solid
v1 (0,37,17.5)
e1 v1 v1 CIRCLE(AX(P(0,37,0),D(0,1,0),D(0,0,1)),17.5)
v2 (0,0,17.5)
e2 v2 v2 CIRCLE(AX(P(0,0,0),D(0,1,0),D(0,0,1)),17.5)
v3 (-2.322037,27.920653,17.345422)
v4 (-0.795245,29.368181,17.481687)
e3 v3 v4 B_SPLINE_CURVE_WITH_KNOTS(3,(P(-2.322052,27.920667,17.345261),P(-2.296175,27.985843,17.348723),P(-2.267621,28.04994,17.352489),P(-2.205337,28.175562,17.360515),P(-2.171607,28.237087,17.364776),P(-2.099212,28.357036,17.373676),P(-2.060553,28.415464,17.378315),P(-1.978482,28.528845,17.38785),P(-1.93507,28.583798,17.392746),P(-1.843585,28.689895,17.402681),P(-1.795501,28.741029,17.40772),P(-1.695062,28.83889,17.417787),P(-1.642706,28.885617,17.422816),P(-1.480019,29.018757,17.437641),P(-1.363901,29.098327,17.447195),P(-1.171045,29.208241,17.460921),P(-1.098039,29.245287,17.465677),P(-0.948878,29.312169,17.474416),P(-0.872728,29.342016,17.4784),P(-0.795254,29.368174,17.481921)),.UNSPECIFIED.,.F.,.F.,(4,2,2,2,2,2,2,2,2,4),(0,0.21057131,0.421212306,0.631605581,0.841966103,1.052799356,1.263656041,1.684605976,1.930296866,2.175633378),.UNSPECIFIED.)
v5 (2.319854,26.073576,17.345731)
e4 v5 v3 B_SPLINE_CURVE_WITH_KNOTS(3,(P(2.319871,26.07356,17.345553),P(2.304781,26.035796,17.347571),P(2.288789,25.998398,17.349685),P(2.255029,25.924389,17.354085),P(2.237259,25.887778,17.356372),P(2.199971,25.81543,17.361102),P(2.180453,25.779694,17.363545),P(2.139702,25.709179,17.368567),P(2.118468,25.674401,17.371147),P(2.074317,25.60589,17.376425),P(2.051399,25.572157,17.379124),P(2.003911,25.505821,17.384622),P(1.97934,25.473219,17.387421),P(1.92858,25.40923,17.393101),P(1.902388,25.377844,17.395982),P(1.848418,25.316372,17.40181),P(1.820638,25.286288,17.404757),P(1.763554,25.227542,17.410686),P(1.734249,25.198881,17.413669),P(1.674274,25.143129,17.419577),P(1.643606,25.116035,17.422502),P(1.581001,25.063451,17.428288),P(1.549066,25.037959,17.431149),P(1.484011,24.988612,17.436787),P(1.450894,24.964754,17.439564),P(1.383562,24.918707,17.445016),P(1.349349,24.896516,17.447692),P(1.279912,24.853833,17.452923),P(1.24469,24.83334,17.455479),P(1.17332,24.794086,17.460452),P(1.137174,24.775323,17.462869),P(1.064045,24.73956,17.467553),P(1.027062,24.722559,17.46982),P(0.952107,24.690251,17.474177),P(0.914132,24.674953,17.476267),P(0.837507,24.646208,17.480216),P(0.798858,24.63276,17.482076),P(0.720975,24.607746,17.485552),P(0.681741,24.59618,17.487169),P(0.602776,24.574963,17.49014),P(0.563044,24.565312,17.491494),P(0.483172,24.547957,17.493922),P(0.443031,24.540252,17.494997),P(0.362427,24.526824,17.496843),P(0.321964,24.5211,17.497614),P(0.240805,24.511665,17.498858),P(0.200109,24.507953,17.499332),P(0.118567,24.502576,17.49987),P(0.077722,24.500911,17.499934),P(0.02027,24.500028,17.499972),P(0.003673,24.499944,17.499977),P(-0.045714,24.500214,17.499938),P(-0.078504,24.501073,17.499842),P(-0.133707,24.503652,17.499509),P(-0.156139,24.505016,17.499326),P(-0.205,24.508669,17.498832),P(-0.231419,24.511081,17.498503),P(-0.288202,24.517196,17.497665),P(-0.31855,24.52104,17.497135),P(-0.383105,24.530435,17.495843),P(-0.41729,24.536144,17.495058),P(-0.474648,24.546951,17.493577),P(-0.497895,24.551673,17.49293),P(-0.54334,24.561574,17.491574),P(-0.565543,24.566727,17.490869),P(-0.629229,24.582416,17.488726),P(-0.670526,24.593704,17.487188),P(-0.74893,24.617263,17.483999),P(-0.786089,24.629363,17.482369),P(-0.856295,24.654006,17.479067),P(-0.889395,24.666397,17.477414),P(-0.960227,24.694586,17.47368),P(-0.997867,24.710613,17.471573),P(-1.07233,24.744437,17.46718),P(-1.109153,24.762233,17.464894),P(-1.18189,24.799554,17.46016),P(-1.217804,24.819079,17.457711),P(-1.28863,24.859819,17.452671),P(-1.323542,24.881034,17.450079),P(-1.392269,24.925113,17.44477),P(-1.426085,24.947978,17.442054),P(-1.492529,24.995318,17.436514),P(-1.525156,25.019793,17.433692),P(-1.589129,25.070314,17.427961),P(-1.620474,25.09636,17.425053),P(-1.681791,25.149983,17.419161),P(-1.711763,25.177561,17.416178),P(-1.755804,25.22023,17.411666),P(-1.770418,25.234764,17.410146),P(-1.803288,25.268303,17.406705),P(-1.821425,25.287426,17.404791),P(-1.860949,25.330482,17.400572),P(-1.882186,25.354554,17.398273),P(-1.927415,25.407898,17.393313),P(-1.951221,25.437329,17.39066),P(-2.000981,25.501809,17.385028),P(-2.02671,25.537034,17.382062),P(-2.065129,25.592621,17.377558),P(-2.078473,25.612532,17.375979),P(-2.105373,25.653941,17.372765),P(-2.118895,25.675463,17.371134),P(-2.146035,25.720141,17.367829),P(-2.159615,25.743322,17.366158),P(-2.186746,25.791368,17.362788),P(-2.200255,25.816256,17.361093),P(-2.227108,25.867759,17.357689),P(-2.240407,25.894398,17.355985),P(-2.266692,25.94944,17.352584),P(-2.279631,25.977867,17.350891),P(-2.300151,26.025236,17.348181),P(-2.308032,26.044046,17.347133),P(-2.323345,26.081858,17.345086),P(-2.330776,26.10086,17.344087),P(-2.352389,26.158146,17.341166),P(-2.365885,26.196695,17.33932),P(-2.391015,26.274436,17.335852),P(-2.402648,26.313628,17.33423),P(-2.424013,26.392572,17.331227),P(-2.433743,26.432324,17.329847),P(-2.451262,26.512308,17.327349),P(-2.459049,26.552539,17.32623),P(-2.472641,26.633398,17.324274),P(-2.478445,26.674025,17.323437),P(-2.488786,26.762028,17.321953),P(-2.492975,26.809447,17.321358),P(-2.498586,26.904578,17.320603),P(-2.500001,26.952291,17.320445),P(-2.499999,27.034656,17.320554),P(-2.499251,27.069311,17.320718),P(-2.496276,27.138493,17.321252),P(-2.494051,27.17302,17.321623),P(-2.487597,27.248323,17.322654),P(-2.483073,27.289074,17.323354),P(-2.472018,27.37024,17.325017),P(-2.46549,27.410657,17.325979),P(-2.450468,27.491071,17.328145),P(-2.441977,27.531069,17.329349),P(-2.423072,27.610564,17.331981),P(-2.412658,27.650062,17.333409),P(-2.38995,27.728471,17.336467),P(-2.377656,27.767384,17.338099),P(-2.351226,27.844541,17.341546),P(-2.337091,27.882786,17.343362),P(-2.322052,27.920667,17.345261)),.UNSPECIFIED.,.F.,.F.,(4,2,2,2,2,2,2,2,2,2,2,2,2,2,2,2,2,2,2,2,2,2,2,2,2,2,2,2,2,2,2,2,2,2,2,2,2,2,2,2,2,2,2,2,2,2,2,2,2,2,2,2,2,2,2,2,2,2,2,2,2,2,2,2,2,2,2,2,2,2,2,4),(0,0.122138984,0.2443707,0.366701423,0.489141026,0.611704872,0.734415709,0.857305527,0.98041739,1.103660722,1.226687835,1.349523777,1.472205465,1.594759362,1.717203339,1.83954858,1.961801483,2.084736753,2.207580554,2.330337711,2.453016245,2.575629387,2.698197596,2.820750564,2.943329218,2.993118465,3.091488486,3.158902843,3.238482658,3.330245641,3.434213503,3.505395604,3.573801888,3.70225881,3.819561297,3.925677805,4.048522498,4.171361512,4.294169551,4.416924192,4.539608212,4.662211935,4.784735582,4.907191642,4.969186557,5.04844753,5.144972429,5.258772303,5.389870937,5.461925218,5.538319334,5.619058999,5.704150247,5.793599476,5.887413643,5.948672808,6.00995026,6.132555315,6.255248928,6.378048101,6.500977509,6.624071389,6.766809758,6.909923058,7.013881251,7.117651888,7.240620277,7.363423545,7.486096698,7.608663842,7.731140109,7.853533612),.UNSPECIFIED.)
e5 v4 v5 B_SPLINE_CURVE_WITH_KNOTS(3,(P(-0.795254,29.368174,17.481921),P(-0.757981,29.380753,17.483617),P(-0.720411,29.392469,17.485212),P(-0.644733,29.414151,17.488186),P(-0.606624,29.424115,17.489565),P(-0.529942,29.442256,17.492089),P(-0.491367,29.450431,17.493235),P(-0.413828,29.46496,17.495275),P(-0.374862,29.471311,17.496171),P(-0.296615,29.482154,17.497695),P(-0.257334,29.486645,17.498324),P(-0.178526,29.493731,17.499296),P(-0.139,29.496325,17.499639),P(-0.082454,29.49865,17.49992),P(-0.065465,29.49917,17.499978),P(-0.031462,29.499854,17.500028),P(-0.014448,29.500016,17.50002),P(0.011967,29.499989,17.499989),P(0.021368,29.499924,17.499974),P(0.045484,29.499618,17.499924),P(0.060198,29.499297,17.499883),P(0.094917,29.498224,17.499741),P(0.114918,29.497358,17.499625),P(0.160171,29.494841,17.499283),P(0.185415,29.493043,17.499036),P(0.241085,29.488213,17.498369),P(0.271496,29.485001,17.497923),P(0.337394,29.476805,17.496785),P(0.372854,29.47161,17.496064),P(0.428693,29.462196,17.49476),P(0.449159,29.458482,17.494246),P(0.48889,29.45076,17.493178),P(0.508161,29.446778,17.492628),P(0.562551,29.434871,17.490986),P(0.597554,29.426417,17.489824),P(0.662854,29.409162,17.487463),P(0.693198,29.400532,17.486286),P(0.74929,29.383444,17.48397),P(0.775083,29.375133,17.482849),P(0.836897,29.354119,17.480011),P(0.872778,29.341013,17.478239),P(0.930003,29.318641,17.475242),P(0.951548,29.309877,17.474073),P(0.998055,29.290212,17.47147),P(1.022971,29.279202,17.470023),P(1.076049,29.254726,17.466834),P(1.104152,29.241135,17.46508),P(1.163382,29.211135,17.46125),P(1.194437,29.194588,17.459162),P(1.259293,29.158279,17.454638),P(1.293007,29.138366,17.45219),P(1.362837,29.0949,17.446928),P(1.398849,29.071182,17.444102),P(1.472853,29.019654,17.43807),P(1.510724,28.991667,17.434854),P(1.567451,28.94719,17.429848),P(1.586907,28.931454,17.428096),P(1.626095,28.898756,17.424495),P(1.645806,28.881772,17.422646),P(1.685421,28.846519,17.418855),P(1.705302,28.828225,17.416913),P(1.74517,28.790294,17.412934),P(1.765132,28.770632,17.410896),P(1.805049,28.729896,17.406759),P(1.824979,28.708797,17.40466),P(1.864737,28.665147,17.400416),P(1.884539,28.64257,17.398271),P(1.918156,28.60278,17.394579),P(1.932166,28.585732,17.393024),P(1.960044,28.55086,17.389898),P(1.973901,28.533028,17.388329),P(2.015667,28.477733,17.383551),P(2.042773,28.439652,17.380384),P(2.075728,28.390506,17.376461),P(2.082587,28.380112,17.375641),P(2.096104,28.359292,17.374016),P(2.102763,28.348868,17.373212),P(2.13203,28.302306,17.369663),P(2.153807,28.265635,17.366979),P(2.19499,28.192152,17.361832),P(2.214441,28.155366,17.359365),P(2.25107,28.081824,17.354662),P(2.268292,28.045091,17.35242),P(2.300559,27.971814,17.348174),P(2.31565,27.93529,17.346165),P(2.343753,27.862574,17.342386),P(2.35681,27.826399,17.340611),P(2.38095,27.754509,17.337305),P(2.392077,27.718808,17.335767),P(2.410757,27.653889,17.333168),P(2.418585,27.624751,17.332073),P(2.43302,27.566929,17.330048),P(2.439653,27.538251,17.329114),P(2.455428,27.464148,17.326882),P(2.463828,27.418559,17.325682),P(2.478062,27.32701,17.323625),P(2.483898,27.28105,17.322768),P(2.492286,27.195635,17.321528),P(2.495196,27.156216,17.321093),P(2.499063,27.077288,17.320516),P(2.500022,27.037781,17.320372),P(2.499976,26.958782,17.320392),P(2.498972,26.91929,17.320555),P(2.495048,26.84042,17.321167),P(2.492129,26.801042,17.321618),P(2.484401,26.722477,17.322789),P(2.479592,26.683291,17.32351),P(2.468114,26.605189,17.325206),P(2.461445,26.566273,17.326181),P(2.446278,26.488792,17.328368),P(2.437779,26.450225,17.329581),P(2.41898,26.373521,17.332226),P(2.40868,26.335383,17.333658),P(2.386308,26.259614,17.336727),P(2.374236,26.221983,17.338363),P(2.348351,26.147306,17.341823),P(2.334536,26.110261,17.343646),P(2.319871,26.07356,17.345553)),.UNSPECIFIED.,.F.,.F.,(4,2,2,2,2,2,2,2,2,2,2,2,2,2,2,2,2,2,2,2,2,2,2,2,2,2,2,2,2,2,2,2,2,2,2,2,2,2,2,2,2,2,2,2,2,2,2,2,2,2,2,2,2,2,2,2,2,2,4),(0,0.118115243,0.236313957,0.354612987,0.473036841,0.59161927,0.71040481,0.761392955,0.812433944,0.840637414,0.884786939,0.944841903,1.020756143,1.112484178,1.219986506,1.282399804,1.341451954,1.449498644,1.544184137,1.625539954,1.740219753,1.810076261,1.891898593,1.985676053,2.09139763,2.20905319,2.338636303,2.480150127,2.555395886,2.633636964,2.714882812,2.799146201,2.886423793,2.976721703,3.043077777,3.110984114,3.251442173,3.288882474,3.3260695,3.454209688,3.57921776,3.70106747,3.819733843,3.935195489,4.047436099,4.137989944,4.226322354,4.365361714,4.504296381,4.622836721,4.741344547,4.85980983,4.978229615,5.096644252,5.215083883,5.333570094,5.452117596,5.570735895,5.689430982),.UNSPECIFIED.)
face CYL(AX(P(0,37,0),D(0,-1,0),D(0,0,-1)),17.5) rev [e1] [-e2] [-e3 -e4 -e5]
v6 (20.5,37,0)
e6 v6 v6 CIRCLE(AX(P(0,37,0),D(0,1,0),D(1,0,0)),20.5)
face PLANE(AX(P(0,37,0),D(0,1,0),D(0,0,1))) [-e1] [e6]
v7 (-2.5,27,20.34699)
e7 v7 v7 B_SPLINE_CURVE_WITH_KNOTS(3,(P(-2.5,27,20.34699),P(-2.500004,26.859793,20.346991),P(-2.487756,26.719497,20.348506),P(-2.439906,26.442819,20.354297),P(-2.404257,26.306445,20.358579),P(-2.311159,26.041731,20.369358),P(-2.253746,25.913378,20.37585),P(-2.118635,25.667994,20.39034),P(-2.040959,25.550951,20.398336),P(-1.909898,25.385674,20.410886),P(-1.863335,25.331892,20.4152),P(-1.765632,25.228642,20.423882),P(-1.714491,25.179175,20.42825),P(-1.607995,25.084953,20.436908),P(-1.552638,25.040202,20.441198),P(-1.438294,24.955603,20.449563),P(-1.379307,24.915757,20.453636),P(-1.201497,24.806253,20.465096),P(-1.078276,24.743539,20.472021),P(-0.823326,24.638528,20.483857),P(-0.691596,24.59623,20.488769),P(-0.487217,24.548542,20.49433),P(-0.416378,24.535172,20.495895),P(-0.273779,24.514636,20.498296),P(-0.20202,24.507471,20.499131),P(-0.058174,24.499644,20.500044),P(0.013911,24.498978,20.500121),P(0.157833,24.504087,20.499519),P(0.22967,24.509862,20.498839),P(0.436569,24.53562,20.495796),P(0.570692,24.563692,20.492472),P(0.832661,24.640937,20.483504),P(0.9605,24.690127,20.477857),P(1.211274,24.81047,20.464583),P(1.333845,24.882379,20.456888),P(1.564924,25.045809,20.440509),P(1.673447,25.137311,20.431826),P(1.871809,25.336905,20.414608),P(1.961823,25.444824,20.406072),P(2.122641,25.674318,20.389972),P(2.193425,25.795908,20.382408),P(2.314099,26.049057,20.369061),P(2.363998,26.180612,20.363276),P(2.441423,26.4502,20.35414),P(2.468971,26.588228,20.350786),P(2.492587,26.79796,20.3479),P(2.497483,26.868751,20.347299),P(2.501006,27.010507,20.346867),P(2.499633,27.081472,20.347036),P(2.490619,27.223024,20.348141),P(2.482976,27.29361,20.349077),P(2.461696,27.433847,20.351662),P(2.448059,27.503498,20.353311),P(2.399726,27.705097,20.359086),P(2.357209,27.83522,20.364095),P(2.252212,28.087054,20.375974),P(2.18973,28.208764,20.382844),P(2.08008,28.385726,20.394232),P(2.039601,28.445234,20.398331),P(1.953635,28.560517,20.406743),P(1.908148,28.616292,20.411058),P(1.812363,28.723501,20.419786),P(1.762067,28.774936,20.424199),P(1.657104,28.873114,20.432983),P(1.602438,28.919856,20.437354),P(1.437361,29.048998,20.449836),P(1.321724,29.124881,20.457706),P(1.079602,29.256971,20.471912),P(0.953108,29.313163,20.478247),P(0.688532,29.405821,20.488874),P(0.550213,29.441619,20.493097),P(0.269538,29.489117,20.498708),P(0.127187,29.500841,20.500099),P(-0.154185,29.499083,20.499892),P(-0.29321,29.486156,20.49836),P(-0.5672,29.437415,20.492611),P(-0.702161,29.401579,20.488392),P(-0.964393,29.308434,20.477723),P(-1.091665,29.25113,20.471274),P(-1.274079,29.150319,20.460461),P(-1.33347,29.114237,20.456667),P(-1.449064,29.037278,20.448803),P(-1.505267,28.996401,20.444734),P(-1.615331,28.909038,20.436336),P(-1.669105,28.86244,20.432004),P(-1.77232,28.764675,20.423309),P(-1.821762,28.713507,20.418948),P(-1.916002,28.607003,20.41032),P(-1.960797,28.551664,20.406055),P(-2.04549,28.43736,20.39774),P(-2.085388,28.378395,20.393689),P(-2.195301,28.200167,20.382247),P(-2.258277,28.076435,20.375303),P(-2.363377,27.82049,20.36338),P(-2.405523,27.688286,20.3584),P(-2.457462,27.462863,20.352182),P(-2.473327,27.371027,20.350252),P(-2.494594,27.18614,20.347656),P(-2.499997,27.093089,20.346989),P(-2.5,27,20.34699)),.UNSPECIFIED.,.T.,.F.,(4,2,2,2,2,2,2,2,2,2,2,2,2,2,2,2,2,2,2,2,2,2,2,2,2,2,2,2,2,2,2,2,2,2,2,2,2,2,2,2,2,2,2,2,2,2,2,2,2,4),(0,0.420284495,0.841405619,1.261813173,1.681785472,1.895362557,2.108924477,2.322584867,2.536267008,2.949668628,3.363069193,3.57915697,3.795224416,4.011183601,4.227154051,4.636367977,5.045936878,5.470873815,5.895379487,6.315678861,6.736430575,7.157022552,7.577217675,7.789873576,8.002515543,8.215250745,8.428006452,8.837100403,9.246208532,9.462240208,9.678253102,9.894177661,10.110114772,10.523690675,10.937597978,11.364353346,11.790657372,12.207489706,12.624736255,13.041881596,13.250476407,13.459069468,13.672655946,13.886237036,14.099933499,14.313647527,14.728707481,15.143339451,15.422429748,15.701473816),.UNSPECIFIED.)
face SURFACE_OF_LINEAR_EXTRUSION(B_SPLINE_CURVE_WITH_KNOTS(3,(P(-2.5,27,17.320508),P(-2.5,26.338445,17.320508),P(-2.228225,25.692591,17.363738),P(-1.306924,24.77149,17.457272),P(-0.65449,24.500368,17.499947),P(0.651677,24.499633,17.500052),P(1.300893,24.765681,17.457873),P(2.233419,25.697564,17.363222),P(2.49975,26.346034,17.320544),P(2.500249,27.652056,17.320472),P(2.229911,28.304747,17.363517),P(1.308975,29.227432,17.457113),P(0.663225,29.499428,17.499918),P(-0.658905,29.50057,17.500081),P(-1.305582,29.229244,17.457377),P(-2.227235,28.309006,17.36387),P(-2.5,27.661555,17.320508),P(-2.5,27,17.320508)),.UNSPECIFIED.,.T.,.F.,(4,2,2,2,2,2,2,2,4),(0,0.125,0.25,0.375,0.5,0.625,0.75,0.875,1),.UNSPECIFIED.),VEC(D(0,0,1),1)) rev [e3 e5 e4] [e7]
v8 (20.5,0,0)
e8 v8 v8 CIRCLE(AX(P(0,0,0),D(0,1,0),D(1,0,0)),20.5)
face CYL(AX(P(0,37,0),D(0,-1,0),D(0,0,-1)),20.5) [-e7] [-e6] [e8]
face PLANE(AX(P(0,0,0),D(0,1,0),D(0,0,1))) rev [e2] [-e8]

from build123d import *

# Parameters (mm, degrees)
SKETCH1_R           = 20.5
SKETCH1_R_2         = 17.5
EXTRUDE_THIN1_DEPTH = 37
CUT_EXTRUDE1_START  = 17.320381507
CUT_EXTRUDE1_DEPTH  = 3.179618529


# Read off the part's stored shape, not the designer's step: Cut-Extrude1
with BuildPart() as part:
    # Sketch1 → Extrude-Thin1 (new body)
    with BuildSketch(Plane(origin=(0, 0, 0), x_dir=(1, 0, 0), z_dir=(0, 1, 0))):
        Circle(SKETCH1_R)
        Circle(SKETCH1_R_2, mode=Mode.SUBTRACT)
    extrude(amount=EXTRUDE_THIN1_DEPTH)

    # Cut-Extrude1 outline → Cut-Extrude1 (cut)
    with BuildSketch(Plane.XY.offset(CUT_EXTRUDE1_START)):
        with BuildLine():
            add(Edge.make_bspline(
                [(-2.5, 27), (-2.5, 26.338444988), (-2.228225053, 25.692590791), (-1.306923592, 24.771490083), (-0.654490366, 24.500367844), (0.651677184, 24.499632947), (1.300892613, 24.765681051), (2.233419343, 25.697563516), (2.499750322, 26.346033507), (2.500249313, 27.65205615), (2.229910618, 28.304747367), (1.308975128, 29.227431519), (0.663224576, 29.499427935), (-0.65890479, 29.500570199), (-1.305581553, 29.229243688), (-2.227234734, 28.30900575), (-2.5, 27.661555012), (-2.5, 27)],
                knots=[0, 0, 0, 0, 0.125, 0.125, 0.25, 0.25, 0.375, 0.375, 0.5, 0.5, 0.625, 0.625, 0.75, 0.75, 0.875, 0.875, 1, 1, 1, 1], degree=3))
        make_face()
    extrude(amount=CUT_EXTRUDE1_DEPTH, mode=Mode.SUBTRACT)


solid = part.part
